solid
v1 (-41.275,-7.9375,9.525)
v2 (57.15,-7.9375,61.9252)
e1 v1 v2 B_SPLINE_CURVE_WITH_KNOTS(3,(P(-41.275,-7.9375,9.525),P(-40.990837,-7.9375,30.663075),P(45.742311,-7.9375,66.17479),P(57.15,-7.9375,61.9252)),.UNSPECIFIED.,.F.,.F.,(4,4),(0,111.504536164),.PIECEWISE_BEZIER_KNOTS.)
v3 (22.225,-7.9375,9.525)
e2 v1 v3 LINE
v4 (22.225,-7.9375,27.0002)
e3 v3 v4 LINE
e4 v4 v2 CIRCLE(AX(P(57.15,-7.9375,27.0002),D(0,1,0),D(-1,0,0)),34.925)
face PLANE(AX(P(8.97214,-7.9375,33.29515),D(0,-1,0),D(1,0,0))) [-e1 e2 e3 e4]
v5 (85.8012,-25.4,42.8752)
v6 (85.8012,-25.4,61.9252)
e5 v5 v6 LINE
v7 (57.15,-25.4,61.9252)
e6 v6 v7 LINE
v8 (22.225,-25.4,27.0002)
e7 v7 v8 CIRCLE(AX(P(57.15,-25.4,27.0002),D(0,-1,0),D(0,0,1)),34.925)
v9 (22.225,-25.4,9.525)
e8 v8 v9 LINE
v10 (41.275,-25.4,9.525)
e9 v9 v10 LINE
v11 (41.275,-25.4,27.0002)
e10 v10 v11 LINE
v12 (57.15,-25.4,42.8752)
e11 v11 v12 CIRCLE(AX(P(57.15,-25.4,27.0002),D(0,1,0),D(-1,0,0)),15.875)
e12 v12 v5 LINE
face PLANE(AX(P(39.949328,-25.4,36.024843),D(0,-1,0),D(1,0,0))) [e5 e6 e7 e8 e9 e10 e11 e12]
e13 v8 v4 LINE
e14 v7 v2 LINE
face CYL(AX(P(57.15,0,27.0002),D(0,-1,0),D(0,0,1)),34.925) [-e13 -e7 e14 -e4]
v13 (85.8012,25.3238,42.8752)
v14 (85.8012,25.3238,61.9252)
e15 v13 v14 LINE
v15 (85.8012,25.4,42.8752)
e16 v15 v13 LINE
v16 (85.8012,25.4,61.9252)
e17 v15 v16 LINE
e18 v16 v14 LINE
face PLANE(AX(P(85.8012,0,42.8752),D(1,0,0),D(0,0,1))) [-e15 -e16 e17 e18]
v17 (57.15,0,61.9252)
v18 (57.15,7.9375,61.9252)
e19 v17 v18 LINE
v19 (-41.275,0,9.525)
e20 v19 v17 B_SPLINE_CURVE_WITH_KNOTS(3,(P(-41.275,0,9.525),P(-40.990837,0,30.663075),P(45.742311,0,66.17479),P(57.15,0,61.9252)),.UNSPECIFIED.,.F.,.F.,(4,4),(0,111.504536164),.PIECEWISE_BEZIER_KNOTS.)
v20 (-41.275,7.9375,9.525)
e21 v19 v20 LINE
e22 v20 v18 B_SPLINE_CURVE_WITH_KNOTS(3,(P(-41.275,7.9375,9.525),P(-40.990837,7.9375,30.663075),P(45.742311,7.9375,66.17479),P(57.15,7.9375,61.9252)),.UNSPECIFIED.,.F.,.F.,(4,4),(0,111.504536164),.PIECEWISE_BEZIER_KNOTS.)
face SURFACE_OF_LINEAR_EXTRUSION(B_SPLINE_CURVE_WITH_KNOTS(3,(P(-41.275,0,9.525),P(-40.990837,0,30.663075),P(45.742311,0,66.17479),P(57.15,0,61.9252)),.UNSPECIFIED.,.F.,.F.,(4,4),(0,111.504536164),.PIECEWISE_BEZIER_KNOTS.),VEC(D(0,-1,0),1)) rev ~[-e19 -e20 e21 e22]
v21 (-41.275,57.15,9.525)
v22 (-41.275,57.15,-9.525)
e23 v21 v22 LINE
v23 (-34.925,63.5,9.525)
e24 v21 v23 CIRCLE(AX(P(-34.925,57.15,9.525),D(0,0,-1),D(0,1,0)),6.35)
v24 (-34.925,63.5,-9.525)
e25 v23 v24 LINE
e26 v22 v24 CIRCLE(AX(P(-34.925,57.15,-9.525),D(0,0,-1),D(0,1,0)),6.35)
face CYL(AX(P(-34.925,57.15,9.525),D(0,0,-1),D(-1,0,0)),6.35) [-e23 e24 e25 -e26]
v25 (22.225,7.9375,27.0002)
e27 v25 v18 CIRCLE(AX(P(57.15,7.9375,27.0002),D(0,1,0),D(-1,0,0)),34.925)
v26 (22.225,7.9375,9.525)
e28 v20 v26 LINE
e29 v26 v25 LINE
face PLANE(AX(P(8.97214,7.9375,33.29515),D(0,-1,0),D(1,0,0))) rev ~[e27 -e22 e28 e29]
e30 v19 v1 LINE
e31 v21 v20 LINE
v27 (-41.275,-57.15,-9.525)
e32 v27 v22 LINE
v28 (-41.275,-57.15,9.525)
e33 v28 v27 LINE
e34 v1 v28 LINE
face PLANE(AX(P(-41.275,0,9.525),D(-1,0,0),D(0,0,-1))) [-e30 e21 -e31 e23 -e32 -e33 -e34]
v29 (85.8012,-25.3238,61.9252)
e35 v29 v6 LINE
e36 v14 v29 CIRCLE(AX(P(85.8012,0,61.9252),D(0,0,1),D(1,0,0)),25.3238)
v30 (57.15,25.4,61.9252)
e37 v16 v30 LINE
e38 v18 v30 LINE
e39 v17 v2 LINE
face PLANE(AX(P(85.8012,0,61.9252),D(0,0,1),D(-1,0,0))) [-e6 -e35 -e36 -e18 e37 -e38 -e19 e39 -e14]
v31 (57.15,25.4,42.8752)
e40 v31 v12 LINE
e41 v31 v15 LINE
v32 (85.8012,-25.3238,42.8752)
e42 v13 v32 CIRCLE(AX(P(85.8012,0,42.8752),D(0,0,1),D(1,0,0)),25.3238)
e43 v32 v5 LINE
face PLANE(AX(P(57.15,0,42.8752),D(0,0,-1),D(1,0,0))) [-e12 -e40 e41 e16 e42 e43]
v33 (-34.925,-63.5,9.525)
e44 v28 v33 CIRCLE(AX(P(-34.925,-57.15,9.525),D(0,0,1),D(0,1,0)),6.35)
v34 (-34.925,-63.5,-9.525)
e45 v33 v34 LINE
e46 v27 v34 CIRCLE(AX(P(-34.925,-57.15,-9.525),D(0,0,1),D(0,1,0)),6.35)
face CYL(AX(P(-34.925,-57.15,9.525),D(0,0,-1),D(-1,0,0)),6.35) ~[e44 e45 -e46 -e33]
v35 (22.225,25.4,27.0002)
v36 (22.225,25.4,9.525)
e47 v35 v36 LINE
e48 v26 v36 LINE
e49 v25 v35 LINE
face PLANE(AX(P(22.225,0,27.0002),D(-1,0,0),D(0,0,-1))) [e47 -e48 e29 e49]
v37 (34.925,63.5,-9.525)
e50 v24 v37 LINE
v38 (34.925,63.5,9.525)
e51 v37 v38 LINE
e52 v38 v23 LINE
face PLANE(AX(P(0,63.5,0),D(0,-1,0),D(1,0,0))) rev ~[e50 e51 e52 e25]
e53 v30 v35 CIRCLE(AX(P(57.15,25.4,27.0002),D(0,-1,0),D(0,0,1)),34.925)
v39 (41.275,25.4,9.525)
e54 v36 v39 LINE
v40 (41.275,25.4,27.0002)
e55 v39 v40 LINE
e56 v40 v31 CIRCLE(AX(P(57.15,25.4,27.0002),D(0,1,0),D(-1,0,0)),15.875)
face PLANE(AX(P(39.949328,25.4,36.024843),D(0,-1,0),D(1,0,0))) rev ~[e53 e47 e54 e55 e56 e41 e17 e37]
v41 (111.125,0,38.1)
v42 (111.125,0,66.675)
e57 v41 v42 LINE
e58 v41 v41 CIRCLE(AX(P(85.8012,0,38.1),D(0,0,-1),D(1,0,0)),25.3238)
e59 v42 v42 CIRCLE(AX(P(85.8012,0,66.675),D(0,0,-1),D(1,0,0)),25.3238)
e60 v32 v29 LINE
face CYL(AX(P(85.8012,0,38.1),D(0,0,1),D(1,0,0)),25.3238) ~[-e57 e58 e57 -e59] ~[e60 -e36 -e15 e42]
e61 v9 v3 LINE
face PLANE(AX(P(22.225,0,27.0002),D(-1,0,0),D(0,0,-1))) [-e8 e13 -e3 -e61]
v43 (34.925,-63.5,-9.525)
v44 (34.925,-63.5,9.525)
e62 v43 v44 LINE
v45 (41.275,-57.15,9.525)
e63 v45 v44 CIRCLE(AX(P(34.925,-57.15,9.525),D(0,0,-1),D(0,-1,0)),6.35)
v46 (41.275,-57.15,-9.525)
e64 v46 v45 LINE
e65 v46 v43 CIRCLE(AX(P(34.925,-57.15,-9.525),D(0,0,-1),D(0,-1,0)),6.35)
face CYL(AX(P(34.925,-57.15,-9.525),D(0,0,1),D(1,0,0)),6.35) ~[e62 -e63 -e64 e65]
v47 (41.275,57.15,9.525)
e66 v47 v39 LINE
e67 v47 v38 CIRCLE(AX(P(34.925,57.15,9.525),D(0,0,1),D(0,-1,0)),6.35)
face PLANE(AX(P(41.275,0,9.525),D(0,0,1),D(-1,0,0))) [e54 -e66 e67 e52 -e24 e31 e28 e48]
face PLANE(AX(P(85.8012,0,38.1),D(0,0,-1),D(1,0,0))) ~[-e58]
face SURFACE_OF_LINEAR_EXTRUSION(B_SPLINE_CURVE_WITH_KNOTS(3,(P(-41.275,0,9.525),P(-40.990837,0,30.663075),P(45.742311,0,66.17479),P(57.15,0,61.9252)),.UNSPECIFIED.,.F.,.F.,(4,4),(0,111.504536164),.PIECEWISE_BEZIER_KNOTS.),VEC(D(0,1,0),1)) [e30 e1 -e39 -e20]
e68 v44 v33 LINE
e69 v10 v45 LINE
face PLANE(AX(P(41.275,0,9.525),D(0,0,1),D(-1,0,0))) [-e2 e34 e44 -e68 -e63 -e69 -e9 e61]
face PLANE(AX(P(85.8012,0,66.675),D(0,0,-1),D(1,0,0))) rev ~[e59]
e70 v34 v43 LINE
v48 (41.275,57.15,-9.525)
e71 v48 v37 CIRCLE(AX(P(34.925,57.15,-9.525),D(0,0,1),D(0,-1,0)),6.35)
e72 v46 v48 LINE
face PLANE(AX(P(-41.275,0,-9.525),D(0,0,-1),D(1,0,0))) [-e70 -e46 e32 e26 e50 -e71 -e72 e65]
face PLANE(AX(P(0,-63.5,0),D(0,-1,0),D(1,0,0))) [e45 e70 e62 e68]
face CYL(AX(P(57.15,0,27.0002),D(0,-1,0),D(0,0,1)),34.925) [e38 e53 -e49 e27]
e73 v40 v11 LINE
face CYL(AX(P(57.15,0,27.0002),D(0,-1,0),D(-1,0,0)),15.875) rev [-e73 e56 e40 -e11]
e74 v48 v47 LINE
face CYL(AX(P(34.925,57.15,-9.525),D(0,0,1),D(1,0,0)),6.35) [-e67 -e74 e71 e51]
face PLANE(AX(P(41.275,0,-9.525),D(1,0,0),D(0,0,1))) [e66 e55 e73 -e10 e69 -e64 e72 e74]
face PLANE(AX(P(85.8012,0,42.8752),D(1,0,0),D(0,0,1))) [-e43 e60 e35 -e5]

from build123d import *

# Parameters (mm, degrees)
F0_W     = 25.4762
F0_H     = 19.05
F1_DEPTH = 25.4
F2_DEPTH = 63.5
F3_DEPTH = 7.9375
F5_R     = 6.35


# Not quite as in the source:
# - a feature names something its author has since deleted; it is built from what else it names


with BuildPart() as f1:
    # F0 (on Front) → F1 (new body, symmetric)
    with BuildSketch(Plane.XZ):
        with BuildLine():
            Line((22.225, 9.525), (41.275, 9.525))
            Line((41.275, 9.525), (41.275, 27.0002))
            ThreePointArc((41.275, 27.0002), (45.9246798487, 38.2255201513), (57.15, 42.8752))
            Line((57.15, 42.8752), (60.325, 42.8752))
            Line((60.325, 42.8752), (60.325, 61.9252))
            Line((60.325, 61.9252), (57.15, 61.9252))
            ThreePointArc((57.15, 61.9252), (32.4542956671, 51.6959043329), (22.225, 27.0002))
            Line((22.225, 27.0002), (22.225, 9.525))
        make_face()
        with Locations((73.0631, 52.4002)):
            Rectangle(F0_W, F0_H)
    extrude(amount=F1_DEPTH, both=True)

    # F0 (on Front) → F2 (join, symmetric)
    with BuildSketch(Plane.XZ):
        Polygon((41.275, -9.525), (41.275, 9.525), (22.225, 9.525), (-41.275, 9.525), (-41.275, -9.525), align=None)
    extrude(amount=F2_DEPTH, both=True)

    # F0 (on Front) → F3 (join, symmetric)
    with BuildSketch(Plane.XZ):
        with BuildLine():
            Line((-41.275, 9.525), (22.225, 9.525))
            Line((22.225, 9.525), (22.225, 27.0002))
            ThreePointArc((22.225, 27.0002), (32.4542956671, 51.6959043329), (57.15, 61.9252))
            add(Edge.make_bspline(
                [(-41.275, 9.525), (-40.9908369184, 30.6630749255), (45.7423105836, 66.1747902632), (57.15, 61.9252)],
                knots=[0, 0, 0, 0, 111.5045361635, 111.5045361635, 111.5045361635, 111.5045361635], degree=3))
        make_face()
    extrude(amount=F3_DEPTH, both=True)

    # F0 (on Front) → F4 (revolve)
    with BuildSketch(Plane.XZ):
        Polygon((85.8012, 61.9252), (85.8012, 42.8752), (85.8012, 38.1), (111.125, 38.1), (111.125, 66.675), (85.8012, 66.675), align=None)
    revolve(axis=Axis((85.8012, 0, 52.3875), (0, 0, -1)))

    # F5
    f5_edges = [f1.edges().sort_by_distance(p)[0] for p in [
        (41.275, -63.5, 0),
        (-41.275, -63.5, 0),
        (41.275, 63.5, 0),
        (-41.275, 63.5, 0),
    ]]
    fillet(f5_edges, radius=F5_R)


solid = f1.part
